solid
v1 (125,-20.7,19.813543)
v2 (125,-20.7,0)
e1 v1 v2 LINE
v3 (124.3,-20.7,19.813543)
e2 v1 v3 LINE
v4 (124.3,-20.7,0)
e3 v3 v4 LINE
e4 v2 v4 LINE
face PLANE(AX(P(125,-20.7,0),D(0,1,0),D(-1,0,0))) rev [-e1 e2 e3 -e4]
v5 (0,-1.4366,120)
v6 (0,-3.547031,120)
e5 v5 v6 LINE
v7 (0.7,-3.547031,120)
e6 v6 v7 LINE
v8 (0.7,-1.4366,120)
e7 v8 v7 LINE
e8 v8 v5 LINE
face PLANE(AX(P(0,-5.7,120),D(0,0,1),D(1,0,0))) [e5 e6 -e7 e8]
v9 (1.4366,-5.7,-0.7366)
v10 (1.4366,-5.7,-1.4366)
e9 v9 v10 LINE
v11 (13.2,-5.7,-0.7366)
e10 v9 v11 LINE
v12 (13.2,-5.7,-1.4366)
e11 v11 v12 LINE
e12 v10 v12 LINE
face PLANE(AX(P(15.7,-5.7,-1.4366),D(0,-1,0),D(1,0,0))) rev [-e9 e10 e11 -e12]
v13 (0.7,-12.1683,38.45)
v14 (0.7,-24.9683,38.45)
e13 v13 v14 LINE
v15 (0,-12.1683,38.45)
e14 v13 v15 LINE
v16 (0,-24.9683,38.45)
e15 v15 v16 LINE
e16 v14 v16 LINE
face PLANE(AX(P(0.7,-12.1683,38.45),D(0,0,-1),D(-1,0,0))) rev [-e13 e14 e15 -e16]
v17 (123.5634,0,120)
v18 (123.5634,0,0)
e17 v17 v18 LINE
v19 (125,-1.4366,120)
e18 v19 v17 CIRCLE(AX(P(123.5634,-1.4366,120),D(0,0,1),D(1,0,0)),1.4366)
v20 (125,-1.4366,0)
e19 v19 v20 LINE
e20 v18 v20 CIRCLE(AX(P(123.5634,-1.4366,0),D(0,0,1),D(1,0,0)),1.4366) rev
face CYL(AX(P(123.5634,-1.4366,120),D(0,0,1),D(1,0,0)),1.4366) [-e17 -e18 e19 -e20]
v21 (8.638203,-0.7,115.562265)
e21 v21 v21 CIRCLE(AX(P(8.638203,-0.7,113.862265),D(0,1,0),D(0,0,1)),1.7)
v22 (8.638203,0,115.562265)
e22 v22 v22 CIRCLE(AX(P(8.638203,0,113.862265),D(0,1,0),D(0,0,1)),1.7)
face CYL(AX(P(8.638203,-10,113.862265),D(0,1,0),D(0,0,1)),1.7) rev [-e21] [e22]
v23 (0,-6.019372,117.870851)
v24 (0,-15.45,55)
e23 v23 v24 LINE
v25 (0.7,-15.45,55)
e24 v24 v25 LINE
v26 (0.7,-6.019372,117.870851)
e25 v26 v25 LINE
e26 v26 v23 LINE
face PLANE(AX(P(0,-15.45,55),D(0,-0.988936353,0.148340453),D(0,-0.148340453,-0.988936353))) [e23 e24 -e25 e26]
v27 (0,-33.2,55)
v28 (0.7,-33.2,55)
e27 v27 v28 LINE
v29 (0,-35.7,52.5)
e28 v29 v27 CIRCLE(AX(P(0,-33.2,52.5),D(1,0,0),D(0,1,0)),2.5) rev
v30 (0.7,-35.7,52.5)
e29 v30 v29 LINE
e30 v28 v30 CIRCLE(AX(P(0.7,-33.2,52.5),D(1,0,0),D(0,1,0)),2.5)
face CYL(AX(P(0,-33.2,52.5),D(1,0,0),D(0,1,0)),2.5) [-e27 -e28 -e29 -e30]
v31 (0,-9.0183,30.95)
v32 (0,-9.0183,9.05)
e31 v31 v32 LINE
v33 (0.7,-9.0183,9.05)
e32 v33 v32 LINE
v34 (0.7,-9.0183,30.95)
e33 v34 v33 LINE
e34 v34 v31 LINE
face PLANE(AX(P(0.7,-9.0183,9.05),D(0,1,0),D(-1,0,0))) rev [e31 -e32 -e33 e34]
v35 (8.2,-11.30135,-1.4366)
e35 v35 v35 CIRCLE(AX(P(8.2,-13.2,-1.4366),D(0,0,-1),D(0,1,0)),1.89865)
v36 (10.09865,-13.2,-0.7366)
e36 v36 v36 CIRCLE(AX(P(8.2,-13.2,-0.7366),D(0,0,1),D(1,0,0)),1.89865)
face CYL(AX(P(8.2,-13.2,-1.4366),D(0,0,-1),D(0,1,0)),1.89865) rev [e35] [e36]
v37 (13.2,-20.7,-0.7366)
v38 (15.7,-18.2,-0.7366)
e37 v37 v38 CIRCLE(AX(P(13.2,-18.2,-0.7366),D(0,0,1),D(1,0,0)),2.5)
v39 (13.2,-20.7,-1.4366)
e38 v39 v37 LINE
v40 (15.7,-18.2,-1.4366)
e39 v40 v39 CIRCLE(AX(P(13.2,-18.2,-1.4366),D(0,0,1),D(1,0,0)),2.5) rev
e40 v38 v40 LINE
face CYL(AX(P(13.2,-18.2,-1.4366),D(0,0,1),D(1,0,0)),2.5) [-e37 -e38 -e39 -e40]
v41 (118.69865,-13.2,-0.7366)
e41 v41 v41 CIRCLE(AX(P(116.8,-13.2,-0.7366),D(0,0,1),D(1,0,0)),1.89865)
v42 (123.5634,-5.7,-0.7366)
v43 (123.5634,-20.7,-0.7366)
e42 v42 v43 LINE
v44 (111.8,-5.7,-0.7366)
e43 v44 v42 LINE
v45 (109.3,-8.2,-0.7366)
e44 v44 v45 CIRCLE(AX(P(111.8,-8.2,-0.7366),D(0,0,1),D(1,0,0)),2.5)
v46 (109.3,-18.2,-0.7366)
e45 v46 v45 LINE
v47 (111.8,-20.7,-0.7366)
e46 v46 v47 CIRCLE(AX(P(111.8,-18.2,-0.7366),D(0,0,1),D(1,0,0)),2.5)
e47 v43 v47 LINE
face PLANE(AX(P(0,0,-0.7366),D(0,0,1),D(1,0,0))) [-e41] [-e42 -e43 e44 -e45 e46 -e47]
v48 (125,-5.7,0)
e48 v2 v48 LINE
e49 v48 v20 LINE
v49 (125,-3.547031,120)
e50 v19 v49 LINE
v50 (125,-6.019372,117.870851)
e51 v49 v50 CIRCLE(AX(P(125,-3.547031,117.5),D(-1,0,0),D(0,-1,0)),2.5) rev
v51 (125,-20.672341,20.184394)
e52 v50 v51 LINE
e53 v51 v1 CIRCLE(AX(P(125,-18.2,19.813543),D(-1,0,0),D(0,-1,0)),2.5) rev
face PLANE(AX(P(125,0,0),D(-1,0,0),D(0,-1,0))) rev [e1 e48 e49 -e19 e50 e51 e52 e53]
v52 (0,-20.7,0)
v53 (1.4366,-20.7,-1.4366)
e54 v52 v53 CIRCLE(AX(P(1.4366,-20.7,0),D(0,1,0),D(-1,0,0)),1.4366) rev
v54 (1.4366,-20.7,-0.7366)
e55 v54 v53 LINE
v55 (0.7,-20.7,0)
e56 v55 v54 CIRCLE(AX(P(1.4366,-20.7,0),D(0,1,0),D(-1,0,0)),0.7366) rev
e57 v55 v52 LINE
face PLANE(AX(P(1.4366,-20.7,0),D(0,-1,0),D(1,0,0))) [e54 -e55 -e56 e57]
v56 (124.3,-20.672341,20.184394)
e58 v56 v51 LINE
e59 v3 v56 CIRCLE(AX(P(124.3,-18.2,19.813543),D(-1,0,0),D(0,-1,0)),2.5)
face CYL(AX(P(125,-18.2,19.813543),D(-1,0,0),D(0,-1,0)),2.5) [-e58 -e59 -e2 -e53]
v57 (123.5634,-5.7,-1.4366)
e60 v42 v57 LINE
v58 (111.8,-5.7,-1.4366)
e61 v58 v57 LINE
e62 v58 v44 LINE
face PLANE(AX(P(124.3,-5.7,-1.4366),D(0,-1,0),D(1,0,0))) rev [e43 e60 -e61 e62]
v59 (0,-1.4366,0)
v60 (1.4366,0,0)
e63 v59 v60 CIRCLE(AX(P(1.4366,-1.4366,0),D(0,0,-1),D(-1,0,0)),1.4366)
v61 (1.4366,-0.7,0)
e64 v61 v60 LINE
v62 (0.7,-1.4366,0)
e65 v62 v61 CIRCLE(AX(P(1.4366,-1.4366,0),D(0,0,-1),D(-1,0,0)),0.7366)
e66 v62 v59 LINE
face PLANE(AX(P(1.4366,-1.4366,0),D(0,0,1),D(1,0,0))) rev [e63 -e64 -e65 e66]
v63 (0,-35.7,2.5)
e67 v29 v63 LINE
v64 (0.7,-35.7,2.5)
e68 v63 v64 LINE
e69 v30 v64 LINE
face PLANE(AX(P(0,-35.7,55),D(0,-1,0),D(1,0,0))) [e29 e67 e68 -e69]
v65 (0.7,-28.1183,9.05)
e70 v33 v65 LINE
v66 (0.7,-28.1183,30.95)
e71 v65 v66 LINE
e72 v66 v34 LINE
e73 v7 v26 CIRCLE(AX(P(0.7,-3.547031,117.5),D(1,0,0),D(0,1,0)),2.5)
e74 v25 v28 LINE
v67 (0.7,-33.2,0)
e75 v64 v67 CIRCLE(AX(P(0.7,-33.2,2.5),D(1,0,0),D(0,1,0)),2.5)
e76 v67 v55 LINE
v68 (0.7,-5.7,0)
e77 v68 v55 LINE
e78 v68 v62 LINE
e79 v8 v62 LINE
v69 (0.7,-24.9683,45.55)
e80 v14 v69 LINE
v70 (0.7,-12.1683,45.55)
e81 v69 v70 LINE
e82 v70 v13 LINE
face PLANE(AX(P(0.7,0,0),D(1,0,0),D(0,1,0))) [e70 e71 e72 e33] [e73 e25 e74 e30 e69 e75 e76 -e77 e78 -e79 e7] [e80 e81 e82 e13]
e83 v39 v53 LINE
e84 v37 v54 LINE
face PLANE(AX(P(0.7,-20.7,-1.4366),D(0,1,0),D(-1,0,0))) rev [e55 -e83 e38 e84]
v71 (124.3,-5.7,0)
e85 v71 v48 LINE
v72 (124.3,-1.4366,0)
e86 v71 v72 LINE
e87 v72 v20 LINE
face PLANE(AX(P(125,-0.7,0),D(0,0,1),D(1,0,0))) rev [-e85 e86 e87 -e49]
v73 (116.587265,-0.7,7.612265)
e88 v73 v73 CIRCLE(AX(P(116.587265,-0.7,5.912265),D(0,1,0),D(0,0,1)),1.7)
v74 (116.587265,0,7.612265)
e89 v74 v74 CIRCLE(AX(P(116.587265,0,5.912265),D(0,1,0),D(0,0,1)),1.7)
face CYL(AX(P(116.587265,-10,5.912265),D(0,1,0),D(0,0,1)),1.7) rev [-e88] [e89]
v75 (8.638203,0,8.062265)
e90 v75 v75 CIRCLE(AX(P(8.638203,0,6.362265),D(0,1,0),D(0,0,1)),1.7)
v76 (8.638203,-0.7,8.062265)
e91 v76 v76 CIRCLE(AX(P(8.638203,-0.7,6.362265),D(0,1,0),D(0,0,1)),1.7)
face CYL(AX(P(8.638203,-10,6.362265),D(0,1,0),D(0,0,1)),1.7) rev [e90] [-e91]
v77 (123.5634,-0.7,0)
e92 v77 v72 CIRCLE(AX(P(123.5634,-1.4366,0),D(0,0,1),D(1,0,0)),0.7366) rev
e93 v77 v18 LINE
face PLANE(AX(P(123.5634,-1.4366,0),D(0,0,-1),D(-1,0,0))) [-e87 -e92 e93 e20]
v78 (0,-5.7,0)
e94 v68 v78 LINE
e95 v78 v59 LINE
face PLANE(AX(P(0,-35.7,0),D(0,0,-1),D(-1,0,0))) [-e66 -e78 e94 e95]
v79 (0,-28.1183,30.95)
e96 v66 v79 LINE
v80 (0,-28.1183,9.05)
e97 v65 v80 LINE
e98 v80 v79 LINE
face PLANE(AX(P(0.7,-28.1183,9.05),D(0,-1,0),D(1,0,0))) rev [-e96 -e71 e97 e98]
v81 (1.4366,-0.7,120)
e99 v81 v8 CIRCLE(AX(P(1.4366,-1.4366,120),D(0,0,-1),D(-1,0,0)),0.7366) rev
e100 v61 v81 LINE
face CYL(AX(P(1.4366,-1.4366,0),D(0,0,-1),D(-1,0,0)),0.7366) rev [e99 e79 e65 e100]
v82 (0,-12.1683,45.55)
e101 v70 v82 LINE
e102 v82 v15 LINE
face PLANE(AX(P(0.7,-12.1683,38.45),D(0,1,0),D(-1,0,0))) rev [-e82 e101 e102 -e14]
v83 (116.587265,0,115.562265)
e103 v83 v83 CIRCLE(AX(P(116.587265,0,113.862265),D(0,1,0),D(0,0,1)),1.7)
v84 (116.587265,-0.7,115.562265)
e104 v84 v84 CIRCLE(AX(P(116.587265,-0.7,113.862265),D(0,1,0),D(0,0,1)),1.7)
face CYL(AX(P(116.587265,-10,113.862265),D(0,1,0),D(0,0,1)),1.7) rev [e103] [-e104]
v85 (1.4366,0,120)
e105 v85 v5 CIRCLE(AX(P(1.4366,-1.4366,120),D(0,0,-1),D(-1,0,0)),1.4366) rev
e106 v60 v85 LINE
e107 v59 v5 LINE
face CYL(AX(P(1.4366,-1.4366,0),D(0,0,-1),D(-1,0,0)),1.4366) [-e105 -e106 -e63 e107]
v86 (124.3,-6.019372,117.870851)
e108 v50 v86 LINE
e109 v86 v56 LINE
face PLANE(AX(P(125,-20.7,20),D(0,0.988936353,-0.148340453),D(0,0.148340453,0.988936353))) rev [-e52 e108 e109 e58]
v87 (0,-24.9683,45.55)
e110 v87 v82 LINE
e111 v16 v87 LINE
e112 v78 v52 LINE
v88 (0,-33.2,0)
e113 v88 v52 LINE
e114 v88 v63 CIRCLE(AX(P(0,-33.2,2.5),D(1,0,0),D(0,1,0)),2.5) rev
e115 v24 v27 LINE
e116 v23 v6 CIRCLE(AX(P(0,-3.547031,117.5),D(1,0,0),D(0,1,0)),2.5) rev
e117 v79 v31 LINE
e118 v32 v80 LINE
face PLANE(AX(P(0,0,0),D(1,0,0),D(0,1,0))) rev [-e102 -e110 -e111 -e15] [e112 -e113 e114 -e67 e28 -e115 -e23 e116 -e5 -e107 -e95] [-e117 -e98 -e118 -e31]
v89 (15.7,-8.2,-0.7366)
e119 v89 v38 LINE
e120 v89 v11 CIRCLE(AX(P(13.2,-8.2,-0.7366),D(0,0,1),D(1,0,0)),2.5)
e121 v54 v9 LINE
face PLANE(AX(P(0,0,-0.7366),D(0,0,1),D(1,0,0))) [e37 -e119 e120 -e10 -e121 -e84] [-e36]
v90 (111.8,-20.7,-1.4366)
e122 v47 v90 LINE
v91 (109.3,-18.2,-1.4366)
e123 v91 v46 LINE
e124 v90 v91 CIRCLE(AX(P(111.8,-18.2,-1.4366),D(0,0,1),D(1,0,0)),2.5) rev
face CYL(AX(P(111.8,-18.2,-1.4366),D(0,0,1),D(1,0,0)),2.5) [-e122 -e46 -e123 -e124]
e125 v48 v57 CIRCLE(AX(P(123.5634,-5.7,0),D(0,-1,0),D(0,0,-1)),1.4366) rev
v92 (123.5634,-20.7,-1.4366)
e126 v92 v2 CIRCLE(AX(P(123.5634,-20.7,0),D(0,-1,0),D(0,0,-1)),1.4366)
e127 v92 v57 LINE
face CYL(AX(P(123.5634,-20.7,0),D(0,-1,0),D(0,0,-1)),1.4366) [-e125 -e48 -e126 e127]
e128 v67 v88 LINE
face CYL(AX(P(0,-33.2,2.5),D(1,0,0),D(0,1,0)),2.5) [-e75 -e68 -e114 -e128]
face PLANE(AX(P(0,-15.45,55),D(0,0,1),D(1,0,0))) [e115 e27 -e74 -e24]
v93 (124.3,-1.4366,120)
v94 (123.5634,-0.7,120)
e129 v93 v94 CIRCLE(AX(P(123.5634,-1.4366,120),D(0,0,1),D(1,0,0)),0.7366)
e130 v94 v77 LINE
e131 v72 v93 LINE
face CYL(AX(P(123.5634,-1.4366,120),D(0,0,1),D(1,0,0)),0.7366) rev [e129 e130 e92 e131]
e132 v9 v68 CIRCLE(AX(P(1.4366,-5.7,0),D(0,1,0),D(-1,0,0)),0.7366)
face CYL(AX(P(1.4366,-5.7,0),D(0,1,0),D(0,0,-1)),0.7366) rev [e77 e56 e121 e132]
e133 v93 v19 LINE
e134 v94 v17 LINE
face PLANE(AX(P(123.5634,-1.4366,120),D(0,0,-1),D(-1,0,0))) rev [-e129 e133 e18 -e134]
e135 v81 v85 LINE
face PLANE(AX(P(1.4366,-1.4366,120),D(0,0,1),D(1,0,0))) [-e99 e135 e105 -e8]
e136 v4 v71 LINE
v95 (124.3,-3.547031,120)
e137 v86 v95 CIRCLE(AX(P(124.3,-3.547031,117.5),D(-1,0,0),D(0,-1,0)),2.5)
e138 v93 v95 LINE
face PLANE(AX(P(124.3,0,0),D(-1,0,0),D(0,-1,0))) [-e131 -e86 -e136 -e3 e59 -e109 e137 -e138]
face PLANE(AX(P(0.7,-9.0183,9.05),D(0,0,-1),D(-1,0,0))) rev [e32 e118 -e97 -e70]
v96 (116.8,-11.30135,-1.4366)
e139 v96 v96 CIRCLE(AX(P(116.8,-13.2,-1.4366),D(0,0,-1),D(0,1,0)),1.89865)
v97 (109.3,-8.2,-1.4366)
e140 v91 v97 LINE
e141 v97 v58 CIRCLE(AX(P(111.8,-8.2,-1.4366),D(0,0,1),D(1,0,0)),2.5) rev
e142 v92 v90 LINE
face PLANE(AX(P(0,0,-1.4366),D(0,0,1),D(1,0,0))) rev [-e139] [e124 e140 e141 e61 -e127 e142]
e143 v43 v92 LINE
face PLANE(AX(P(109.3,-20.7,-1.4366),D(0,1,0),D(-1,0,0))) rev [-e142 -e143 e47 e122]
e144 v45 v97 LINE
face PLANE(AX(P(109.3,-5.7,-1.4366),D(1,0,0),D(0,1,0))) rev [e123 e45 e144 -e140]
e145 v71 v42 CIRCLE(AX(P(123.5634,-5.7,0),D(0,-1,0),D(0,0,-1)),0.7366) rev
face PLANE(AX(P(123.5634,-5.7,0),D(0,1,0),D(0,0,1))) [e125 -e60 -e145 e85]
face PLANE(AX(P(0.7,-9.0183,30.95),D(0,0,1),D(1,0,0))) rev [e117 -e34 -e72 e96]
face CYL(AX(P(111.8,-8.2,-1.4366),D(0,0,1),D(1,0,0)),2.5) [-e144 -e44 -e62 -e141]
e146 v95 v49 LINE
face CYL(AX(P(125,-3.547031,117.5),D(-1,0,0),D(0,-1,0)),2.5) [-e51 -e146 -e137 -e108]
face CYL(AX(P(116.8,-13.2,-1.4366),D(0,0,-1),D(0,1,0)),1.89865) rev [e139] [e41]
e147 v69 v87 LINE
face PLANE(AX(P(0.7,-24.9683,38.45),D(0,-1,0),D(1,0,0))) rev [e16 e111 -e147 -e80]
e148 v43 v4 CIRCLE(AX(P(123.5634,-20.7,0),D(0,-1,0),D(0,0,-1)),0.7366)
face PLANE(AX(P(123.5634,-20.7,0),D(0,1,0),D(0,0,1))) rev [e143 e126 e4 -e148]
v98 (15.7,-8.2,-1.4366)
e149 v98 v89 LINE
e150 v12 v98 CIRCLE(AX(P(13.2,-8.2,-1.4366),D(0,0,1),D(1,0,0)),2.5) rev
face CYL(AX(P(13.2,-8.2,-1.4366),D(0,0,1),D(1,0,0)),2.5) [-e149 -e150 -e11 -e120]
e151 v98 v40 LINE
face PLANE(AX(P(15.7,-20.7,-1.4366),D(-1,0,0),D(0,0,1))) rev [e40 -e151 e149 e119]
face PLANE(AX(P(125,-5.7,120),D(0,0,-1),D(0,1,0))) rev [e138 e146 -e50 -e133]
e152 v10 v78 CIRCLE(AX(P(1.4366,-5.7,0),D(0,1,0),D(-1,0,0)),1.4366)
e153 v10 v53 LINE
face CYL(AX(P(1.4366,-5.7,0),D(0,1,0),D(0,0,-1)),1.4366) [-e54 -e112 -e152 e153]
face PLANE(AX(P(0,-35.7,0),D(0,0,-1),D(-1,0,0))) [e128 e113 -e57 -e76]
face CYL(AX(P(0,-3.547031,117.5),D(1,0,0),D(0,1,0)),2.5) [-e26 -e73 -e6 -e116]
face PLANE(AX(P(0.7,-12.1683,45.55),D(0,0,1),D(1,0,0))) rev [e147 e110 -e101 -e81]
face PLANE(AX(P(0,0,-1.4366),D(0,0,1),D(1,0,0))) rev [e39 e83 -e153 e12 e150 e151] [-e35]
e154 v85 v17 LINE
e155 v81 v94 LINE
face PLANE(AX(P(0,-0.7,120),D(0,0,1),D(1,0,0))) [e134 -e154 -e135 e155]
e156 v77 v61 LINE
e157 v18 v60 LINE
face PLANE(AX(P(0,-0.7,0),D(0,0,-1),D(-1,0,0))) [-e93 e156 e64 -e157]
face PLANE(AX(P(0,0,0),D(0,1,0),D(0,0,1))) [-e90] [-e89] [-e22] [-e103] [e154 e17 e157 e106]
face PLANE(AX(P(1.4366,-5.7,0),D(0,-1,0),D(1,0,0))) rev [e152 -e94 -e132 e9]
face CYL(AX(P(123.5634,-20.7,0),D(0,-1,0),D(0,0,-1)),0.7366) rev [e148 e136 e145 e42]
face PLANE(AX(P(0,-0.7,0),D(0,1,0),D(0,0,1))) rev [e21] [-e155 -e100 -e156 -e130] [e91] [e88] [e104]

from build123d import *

# Parameters (mm, degrees)
SKETCH1_W                    = 125
SKETCH1_H                    = 120
BASE_FLANGE1_DEPTH           = 0.7
EDGE_FLANGE1_STRIP_W         = 4.2732
EDGE_FLANGE1_STRIP_H         = 0.7
EDGE_FLANGE1_STRIP_CUT_DEPTH = 120
EDGE_FLANGE1_DEPTH           = 120
EDGE_FLANGE1_FLAT_DEPTH      = 0.7
EDGE_FLANGE2_STRIP_W         = 4.2732
EDGE_FLANGE2_STRIP_H         = 0.7
EDGE_FLANGE2_STRIP_CUT_DEPTH = 120
EDGE_FLANGE2_DEPTH           = 120
EDGE_FLANGE2_FLAT_DEPTH      = 0.7
SKETCH10_R                   = 1.7
CUT_EXTRUDE1_DEPTH           = 10
EDGE_FLANGE3_DEPTH           = 15
EDGE_FLANGE4_DEPTH           = 15
F_6_CLEARANCE_HOLE1_D        = 3.7973
F_6_CLEARANCE_HOLE1_DEPTH    = 10
F_6_CLEARANCE_HOLE1_TIP      = 1.140824014
BREAK_CORNER1_START          = -1
BREAK_CORNER1_DEPTH          = 127
BREAK_CORNER1_START_2        = 123.5634
BREAK_CORNER1_2_DEPTH        = 2.4366
BREAK_CORNER1_START_3        = -2
BREAK_CORNER1_3_DEPTH        = 2
SKETCH23_W                   = 21.9
SKETCH23_H                   = 19.1
SKETCH23_W_2                 = 7.1
SKETCH23_H_2                 = 12.8
CUT_EXTRUDE2_DEPTH           = 0.7


with BuildPart() as part:
    # Base-Flange1: sheet metal written as solids
    # Sketch1 → Base-Flange1 (new body)
    with BuildSketch(Plane(origin=(0, 0, 0), x_dir=(1, 0, 0), z_dir=(0, 1, 0))):
        with Locations((62.5, -60)):
            Rectangle(SKETCH1_W, SKETCH1_H)
    extrude(amount=-BASE_FLANGE1_DEPTH)

    # Edge-Flange1: sheet metal written as solids
    # Edge-Flange1 strip (on a plane across the edge) → Edge-Flange1 strip cut (cut)
    with BuildSketch(Plane(origin=(125, -0.7, 0), x_dir=(-1, 0, 0), z_dir=(0, 0, 1))):
        with Locations((-0.7, -0.35)):
            Rectangle(EDGE_FLANGE1_STRIP_W, EDGE_FLANGE1_STRIP_H)
    extrude(amount=EDGE_FLANGE1_STRIP_CUT_DEPTH, mode=Mode.SUBTRACT)

    # Edge-Flange1 bend section (on a plane across the edge) → Edge-Flange1 (add)
    with BuildSketch(Plane(origin=(125, -0.7, 0), x_dir=(-1, 0, 0), z_dir=(0, 0, 1))):
        with BuildLine():
            Line((0, 0.7366), (0.7, 0.7366))
            ThreePointArc((0.7, 0.7366), (0.915745145, 0.215745145), (1.4366, 0))
            Line((1.4366, 0), (1.4366, -0.7))
            ThreePointArc((1.4366, -0.7), (0.420770398, -0.279229602), (0, 0.7366))
        make_face()
    extrude(amount=EDGE_FLANGE1_DEPTH)

    # Edge-Flange1 profile (on flange) → Edge-Flange1 flat (add)
    with BuildSketch(Plane(origin=(125, -0.7, 0), x_dir=(0, 0, 1), z_dir=(1, 0, 0))):
        Polygon((120, 0.7366), (120, 5), (20, 20), (0, 20), (0, 0.7366), align=None)
    extrude(amount=-EDGE_FLANGE1_FLAT_DEPTH)

    # Edge-Flange2: sheet metal written as solids
    # Edge-Flange2 strip (on a plane across the edge) → Edge-Flange2 strip cut (cut)
    with BuildSketch(Plane(origin=(0, -0.7, 120), x_dir=(1, 0, 0), z_dir=(0, 0, -1))):
        with Locations((-0.7, -0.35)):
            Rectangle(EDGE_FLANGE2_STRIP_W, EDGE_FLANGE2_STRIP_H)
    extrude(amount=EDGE_FLANGE2_STRIP_CUT_DEPTH, mode=Mode.SUBTRACT)

    # Edge-Flange2 bend section (on a plane across the edge) → Edge-Flange2 (add)
    with BuildSketch(Plane(origin=(0, -0.7, 120), x_dir=(1, 0, 0), z_dir=(0, 0, -1))):
        with BuildLine():
            Line((0, 0.7366), (0.7, 0.7366))
            ThreePointArc((0.7, 0.7366), (0.915745145, 0.215745145), (1.4366, 0))
            Line((1.4366, 0), (1.4366, -0.7))
            ThreePointArc((1.4366, -0.7), (0.420770398, -0.279229602), (0, 0.7366))
        make_face()
    extrude(amount=EDGE_FLANGE2_DEPTH)

    # Edge-Flange2 profile (on flange) → Edge-Flange2 flat (add)
    with BuildSketch(Plane(origin=(0, -0.7, 0), x_dir=(0, 0, 1), z_dir=(1, 0, 0))):
        Polygon((120, 0.7366), (120, 5), (55, 14.75), (55, 35), (0, 35), (0, 20), (0, 0.7366), align=None)
    extrude(amount=EDGE_FLANGE2_FLAT_DEPTH)

    # Sketch10 → Cut-Extrude1 (cut)
    with BuildSketch(Plane(origin=(0, 0, 0), x_dir=(1, 0, 0), z_dir=(0, 1, 0))):
        with Locations(Location((116.587265025, -113.862265027, 0), (0, 0, 270))):
            Circle(SKETCH10_R)
        with Locations(Location((116.587265025, -5.912265027, 0), (0, 0, 270))):
            Circle(SKETCH10_R)
        with Locations(Location((8.638202963, -6.362265027, 0), (0, 0, 270))):
            Circle(SKETCH10_R)
        with Locations(Location((8.638202963, -113.862265027, 0), (0, 0, 270))):
            Circle(SKETCH10_R)
    extrude(amount=-CUT_EXTRUDE1_DEPTH, mode=Mode.SUBTRACT)

    # Edge-Flange3: sheet metal written as solids
    # Edge-Flange3 section (on a plane across the edge) → Edge-Flange3 (add)
    with BuildSketch(Plane(origin=(124.3, -5.7, -0.7366), x_dir=(0, 0, 1), z_dir=(0, -1, 0))):
        with BuildLine():
            Line((-0.7, 0.7366), (-0.7, 15))
            Line((-0.7, 15), (0, 15))
            Line((0, 15), (0, 0.7366))
            ThreePointArc((0, 0.7366), (0.215745145, 0.215745145), (0.7366, 0))
            Line((0.7366, 0), (0.7366, -0.7))
            ThreePointArc((0.7366, -0.7), (-0.279229602, -0.279229602), (-0.7, 0.7366))
        make_face()
    extrude(amount=EDGE_FLANGE3_DEPTH)

    # Edge-Flange4: sheet metal written as solids
    # Edge-Flange4 section (on a plane across the edge) → Edge-Flange4 (add)
    with BuildSketch(Plane(origin=(0.7, -20.7, -0.7366), x_dir=(0, 0, 1), z_dir=(0, 1, 0))):
        with BuildLine():
            Line((-0.7, 0.7366), (-0.7, 15))
            Line((-0.7, 15), (0, 15))
            Line((0, 15), (0, 0.7366))
            ThreePointArc((0, 0.7366), (0.215745145, 0.215745145), (0.7366, 0))
            Line((0.7366, 0), (0.7366, -0.7))
            ThreePointArc((0.7366, -0.7), (-0.279229602, -0.279229602), (-0.7, 0.7366))
        make_face()
    extrude(amount=EDGE_FLANGE4_DEPTH)

    # #6 Clearance Hole1
    with Locations(Plane(origin=(0, 0, -1.4366), x_dir=(-1, 0, 0), z_dir=(0, 0, -1))):
        with Locations((-116.8, -13.2), (-8.2, -13.2)):
            Hole(F_6_CLEARANCE_HOLE1_D / 2, depth=F_6_CLEARANCE_HOLE1_DEPTH)
            with Locations((0, 0, -(F_6_CLEARANCE_HOLE1_DEPTH + F_6_CLEARANCE_HOLE1_TIP / 2))):  # 118° drill point
                Cone(0, F_6_CLEARANCE_HOLE1_D / 2, F_6_CLEARANCE_HOLE1_TIP, mode=Mode.SUBTRACT)

    # Break-Corner1: read off the stored shape, not the designer's step
    # Break-Corner1 outline → Break-Corner1 (cut)
    with BuildSketch(Plane.YZ.offset(BREAK_CORNER1_START)):
        with BuildLine():
            ThreePointArc((-6.01937233, 117.870851132), (-5.178422292, 119.394350526), (-3.547031448, 120))
            Line((-3.547031448, 120), (-5.7, 120))
            Line((-5.7, 120), (-6.01937233, 117.870851132))
        make_face()
        with BuildLine():
            ThreePointArc((-35.7, 52.5), (-34.967766953, 54.267766953), (-33.2, 55))
            Line((-33.2, 55), (-35.7, 55))
            Line((-35.7, 55), (-35.7, 52.5))
        make_face()
        with BuildLine():
            ThreePointArc((-33.2, 0), (-34.967766953, 0.732233047), (-35.7, 2.5))
            Line((-35.7, 2.5), (-35.7, 0))
            Line((-35.7, 0), (-33.2, 0))
        make_face()
    extrude(amount=BREAK_CORNER1_DEPTH, mode=Mode.SUBTRACT)

    # Break-Corner1 2 outline → Break-Corner1 2 (cut)
    with BuildSketch(Plane.YZ.offset(BREAK_CORNER1_START_2)):
        with BuildLine():
            ThreePointArc((-20.7, 19.813542987), (-20.693075631, 19.999483561), (-20.672340882, 20.184394119))
            Line((-20.672340882, 20.184394119), (-20.7, 20))
            Line((-20.7, 20), (-20.7, 19.813542987))
        make_face()
    extrude(amount=BREAK_CORNER1_2_DEPTH, mode=Mode.SUBTRACT)

    # Break-Corner1 3 outline → Break-Corner1 3 (cut)
    with BuildSketch(Plane.XY.offset(BREAK_CORNER1_START_3)):
        with BuildLine():
            ThreePointArc((13.2, -5.7), (14.967766953, -6.432233047), (15.7, -8.2))
            Line((15.7, -8.2), (15.7, -5.7))
            Line((15.7, -5.7), (13.2, -5.7))
        make_face()
        with BuildLine():
            ThreePointArc((15.7, -18.2), (14.967766953, -19.967766953), (13.2, -20.7))
            Line((13.2, -20.7), (15.7, -20.7))
            Line((15.7, -20.7), (15.7, -18.2))
        make_face()
        with BuildLine():
            ThreePointArc((111.8, -20.7), (110.032233047, -19.967766953), (109.3, -18.2))
            Line((109.3, -18.2), (109.3, -20.7))
            Line((109.3, -20.7), (111.8, -20.7))
        make_face()
        with BuildLine():
            ThreePointArc((109.3, -8.2), (110.032233047, -6.432233047), (111.8, -5.7))
            Line((111.8, -5.7), (109.3, -5.7))
            Line((109.3, -5.7), (109.3, -8.2))
        make_face()
    extrude(amount=BREAK_CORNER1_3_DEPTH, mode=Mode.SUBTRACT)

    # Sketch23 → Cut-Extrude2 (cut)
    with BuildSketch(Plane.ZY):
        with Locations((20, -18.5683)):
            Rectangle(SKETCH23_W, SKETCH23_H)
        with Locations((42, -18.5683)):
            Rectangle(SKETCH23_W_2, SKETCH23_H_2)
    extrude(amount=-CUT_EXTRUDE2_DEPTH, mode=Mode.SUBTRACT)


solid = part.part
